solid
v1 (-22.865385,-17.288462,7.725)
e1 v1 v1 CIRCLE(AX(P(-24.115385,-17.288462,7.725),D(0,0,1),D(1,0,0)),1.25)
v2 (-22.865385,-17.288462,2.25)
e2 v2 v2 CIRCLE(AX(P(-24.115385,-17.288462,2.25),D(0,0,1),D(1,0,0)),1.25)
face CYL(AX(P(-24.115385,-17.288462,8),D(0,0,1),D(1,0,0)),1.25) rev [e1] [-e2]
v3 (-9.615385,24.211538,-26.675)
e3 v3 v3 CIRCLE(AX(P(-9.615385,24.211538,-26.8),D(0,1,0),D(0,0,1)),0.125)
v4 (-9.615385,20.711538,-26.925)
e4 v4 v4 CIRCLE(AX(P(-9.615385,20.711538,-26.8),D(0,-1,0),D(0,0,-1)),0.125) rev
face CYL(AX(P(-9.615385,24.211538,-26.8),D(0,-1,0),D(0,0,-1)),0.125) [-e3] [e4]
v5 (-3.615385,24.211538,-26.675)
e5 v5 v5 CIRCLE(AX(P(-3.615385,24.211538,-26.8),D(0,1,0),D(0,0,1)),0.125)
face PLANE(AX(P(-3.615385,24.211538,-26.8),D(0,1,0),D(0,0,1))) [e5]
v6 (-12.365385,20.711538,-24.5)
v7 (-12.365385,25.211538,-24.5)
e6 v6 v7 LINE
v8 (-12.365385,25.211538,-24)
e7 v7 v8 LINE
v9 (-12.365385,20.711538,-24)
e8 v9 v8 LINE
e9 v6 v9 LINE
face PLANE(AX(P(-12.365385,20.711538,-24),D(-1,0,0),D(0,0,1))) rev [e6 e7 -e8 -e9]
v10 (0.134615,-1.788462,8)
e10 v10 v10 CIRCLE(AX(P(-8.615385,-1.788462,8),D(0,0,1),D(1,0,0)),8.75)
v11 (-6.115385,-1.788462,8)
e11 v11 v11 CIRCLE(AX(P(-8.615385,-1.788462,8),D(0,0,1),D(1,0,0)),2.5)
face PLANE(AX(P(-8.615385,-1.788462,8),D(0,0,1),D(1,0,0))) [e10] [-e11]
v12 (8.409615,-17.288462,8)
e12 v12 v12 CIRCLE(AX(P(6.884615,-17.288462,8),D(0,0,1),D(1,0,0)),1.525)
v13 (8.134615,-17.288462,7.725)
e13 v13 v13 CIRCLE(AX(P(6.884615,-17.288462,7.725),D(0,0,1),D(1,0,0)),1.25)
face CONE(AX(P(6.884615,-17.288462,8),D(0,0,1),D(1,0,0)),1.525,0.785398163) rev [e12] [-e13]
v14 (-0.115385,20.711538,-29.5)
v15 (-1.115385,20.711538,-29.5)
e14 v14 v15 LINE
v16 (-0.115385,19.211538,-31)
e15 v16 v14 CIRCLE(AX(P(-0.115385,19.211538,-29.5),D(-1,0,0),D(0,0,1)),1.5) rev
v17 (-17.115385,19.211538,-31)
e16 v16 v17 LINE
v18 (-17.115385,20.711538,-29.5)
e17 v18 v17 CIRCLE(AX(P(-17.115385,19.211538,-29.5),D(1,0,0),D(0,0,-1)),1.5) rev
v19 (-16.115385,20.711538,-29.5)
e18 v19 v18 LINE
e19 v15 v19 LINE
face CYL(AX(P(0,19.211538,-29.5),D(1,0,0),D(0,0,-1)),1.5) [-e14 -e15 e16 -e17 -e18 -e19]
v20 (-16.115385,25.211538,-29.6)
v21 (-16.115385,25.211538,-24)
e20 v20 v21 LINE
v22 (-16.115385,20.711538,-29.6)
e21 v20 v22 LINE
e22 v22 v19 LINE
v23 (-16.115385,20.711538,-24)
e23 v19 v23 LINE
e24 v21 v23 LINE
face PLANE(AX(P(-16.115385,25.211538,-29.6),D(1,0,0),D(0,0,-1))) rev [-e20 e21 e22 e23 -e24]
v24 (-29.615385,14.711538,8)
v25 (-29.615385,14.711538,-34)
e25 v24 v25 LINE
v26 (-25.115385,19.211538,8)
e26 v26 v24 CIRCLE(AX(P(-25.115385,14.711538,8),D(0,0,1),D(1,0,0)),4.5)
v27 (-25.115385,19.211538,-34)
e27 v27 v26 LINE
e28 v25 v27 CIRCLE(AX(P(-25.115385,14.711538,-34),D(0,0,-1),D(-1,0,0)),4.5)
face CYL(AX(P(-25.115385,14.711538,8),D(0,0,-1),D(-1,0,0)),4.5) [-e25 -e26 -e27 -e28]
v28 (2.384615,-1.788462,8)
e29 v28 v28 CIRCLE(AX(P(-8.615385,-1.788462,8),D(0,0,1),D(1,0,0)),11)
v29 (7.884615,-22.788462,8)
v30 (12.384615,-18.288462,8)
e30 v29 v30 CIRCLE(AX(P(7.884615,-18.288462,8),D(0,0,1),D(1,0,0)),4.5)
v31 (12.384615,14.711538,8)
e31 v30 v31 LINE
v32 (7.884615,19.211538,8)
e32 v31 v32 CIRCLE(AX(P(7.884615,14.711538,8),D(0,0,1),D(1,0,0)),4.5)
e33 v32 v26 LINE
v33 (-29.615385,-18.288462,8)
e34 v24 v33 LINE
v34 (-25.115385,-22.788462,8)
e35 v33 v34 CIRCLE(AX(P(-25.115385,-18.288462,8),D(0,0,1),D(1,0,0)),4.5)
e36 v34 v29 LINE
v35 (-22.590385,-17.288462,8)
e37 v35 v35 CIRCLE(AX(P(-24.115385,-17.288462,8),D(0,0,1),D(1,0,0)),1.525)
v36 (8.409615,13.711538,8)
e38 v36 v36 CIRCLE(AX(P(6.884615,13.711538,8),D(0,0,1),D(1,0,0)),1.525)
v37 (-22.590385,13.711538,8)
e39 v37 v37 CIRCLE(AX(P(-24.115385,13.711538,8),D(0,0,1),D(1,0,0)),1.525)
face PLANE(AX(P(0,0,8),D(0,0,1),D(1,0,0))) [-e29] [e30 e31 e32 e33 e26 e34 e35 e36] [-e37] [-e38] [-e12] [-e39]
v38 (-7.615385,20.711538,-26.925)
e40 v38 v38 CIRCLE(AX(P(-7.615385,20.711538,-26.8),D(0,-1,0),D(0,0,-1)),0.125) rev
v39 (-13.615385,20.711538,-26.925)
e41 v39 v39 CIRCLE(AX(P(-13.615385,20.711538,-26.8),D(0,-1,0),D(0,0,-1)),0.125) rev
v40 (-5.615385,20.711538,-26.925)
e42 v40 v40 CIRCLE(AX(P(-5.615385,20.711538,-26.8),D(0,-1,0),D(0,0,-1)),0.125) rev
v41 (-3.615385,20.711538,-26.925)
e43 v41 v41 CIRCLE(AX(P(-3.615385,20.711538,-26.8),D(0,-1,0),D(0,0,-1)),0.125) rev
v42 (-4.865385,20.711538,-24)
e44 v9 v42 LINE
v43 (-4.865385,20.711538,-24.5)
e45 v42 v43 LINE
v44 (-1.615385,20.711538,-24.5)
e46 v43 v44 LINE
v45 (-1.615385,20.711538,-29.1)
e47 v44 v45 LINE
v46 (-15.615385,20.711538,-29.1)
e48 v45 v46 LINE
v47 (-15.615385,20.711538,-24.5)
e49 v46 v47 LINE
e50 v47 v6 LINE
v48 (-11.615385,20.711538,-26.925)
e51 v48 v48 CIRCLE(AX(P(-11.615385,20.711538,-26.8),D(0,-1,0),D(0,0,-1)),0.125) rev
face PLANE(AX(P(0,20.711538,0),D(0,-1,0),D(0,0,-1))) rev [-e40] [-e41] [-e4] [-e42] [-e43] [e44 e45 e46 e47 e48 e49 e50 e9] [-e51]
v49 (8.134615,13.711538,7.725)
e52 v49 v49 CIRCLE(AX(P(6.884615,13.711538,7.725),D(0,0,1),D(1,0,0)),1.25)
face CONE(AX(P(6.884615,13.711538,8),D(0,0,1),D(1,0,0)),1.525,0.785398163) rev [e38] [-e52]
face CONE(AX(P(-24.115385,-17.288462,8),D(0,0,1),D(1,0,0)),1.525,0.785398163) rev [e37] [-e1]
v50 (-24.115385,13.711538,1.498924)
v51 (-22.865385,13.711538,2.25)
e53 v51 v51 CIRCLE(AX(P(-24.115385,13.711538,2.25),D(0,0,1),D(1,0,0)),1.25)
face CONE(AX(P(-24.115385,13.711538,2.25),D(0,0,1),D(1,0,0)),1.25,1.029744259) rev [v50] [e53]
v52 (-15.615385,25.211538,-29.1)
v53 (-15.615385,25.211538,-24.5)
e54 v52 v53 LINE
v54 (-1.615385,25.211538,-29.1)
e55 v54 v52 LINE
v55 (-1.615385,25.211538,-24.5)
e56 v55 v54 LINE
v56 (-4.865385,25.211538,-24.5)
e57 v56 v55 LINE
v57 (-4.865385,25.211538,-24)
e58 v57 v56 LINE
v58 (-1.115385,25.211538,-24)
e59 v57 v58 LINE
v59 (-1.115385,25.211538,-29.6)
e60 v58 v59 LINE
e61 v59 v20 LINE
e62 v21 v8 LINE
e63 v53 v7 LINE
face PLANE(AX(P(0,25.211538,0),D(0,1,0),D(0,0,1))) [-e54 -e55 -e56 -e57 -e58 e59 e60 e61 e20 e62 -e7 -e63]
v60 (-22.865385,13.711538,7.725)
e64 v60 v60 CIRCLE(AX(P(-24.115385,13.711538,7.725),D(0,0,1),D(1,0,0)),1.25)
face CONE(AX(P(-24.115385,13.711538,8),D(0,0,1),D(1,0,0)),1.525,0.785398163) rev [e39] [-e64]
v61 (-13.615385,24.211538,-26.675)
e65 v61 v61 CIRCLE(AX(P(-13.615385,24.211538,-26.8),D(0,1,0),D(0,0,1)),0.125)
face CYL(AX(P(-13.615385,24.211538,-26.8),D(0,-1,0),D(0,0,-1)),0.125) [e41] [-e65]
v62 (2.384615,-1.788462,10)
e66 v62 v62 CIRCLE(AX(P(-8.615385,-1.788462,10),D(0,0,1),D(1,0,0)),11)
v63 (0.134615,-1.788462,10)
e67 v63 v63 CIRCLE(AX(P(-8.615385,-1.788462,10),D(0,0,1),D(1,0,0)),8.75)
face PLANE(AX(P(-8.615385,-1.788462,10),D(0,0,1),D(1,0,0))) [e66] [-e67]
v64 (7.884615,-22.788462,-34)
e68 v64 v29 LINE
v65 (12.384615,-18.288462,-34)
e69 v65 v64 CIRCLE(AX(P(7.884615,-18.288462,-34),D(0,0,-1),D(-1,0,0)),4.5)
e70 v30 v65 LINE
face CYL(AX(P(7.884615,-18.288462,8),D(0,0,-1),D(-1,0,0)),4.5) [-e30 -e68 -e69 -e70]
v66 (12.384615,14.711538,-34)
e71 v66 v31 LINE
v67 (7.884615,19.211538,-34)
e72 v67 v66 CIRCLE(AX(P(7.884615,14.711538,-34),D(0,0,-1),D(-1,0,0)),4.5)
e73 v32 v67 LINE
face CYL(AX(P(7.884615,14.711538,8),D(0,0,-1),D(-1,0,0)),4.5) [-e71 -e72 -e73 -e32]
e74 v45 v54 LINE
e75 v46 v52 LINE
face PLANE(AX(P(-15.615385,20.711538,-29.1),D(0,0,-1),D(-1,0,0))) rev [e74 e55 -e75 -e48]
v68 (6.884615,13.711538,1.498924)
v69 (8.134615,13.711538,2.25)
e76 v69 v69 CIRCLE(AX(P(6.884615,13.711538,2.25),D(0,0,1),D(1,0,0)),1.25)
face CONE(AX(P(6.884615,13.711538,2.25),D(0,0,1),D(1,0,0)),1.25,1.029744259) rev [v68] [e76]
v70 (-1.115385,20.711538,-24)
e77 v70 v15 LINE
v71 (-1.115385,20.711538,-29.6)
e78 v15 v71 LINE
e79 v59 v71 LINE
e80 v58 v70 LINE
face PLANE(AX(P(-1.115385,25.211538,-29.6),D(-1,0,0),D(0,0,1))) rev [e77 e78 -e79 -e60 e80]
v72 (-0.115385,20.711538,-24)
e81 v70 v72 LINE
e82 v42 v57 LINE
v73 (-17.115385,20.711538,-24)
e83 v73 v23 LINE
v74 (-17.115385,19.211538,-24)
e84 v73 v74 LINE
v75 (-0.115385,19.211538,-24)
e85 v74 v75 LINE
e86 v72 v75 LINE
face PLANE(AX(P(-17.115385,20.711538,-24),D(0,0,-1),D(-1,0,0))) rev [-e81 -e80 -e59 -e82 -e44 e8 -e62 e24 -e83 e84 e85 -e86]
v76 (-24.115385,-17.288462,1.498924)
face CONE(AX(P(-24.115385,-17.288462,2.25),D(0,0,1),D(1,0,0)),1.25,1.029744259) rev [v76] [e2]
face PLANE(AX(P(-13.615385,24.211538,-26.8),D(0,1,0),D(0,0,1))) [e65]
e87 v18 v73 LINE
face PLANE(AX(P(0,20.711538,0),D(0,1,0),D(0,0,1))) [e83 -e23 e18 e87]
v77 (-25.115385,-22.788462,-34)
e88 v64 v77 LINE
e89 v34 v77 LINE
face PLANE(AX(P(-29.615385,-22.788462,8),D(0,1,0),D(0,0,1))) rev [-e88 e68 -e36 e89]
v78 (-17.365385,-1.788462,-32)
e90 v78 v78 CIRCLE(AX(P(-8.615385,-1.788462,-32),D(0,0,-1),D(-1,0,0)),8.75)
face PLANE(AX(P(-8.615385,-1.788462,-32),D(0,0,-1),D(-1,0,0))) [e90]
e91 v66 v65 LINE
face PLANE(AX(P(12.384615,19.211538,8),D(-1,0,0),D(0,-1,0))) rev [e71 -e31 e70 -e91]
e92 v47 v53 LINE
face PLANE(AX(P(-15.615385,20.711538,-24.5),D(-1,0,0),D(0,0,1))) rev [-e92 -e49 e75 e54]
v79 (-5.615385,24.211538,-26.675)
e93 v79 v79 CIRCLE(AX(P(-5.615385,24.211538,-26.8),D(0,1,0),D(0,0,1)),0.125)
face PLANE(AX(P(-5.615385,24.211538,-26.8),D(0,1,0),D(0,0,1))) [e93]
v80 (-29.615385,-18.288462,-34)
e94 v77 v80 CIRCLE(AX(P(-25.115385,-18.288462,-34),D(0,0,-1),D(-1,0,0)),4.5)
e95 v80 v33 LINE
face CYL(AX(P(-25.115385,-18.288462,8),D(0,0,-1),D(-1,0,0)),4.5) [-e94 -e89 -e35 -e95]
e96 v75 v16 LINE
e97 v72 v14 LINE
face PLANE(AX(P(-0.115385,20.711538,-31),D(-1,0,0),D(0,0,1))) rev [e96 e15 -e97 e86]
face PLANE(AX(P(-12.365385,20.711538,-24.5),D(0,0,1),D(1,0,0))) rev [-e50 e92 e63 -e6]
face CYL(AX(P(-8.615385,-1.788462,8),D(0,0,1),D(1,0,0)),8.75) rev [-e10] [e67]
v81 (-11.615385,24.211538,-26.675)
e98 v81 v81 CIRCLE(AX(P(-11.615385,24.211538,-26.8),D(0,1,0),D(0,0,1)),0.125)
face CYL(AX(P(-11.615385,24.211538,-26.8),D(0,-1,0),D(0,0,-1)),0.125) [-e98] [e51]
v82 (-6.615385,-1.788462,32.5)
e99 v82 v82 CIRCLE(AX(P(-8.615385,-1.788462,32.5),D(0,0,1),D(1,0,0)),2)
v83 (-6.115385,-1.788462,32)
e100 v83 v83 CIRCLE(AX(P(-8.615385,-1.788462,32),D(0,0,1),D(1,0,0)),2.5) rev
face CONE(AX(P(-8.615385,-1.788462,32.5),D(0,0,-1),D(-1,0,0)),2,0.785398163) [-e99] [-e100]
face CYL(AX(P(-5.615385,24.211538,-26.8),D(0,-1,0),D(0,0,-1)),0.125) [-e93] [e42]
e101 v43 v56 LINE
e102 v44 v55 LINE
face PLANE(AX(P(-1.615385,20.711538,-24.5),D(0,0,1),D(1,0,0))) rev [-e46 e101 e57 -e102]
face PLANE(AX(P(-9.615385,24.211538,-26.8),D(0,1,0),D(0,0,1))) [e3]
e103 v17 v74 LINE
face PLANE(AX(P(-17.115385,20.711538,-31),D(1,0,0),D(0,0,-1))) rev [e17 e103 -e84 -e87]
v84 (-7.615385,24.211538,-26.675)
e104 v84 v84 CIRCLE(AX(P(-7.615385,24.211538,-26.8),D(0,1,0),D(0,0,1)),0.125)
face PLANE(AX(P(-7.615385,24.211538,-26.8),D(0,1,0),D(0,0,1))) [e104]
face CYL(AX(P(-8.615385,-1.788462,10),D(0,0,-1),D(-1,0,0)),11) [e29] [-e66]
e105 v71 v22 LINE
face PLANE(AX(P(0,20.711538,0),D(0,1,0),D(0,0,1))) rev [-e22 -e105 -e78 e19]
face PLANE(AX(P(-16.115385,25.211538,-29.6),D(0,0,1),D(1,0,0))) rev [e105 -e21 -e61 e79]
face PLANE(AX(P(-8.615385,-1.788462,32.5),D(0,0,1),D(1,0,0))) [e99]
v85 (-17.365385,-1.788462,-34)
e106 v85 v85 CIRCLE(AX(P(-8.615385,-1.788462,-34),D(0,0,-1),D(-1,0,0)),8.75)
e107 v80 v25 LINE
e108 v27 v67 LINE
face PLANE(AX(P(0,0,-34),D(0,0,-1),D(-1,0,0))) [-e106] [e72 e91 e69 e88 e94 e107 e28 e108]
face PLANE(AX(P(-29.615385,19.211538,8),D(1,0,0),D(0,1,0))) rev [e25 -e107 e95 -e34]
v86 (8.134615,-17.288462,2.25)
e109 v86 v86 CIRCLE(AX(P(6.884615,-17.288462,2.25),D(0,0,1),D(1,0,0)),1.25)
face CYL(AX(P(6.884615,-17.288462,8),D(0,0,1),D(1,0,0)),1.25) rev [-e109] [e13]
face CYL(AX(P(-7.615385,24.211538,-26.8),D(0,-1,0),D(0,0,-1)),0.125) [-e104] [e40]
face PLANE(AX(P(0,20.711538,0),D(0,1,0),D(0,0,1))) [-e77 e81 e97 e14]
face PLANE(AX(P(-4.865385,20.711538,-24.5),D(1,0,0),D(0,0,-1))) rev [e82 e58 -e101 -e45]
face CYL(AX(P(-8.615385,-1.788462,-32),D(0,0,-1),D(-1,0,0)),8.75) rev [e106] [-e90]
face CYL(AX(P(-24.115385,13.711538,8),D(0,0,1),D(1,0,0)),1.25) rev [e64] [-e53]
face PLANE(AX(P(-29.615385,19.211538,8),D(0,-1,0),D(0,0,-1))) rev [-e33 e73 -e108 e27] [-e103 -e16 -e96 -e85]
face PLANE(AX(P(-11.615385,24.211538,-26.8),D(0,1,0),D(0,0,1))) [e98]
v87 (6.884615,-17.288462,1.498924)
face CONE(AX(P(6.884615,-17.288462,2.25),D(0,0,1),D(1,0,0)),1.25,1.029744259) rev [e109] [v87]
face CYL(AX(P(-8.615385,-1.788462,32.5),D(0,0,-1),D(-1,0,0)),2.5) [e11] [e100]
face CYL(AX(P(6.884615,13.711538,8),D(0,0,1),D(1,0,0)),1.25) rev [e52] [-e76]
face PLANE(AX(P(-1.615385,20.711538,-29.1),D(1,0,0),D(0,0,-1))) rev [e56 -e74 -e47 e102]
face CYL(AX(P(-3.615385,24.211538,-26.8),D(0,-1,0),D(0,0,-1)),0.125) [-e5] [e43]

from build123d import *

# Parameters (mm, degrees)
SKETCH1_W                       = 42
SKETCH1_H                       = 42
BOSS_EXTRUDE2_DEPTH             = 8
SKETCH2_R                       = 11
BOSS_EXTRUDE3_DEPTH             = 2
SKETCH4_W                       = 42
SKETCH4_H                       = 42
BOSS_EXTRUDE5_DEPTH             = 24
SKETCH5_W                       = 42
SKETCH5_H                       = 42
BOSS_EXTRUDE6_DEPTH             = 10
FILLET1_R                       = 4.5
SKETCH7_R                       = 8.75
CUT_EXTRUDE1_DEPTH              = 2
CUT_EXTRUDE2_START              = -2
SKETCH8_R                       = 8.75
CUT_EXTRUDE2_DEPTH              = 2
SKETCH9_R                       = 2.5
BOSS_EXTRUDE9_DEPTH             = 24.5
CHAMFER2_SIZE                   = 0.5
M3X0_5_TAPPED_HOLE1_D           = 2.5
M3X0_5_TAPPED_HOLE1_DEPTH       = 5.75
M3X0_5_TAPPED_HOLE1_CSINK_D     = 3.05
M3X0_5_TAPPED_HOLE1_CSINK_ANGLE = 90
M3X0_5_TAPPED_HOLE1_TIP         = 0.751075774
SKETCH12_W                      = 17
SKETCH12_H                      = 7
BOSS_EXTRUDE10_DEPTH            = 1.5
FILLET2_R                       = 1.5
SKETCH13_W                      = 15
SKETCH13_H                      = 5.6
BOSS_EXTRUDE11_DEPTH            = 4.5
CUT_EXTRUDE3_DEPTH              = 4.5
SKETCH16_R                      = 0.125
BOSS_EXTRUDE12_DEPTH            = 3.5
LPATTERN1_COUNT                 = 6
LPATTERN1_PITCH                 = 2


with BuildPart() as part:
    # Sketch1 → Boss-Extrude2 (new body)
    with BuildSketch(Plane.XY):
        with Locations((-8.615384615, -1.788461538)):
            Rectangle(SKETCH1_W, SKETCH1_H)
    extrude(amount=BOSS_EXTRUDE2_DEPTH)

    # Sketch2 → Boss-Extrude3 (add)
    with BuildSketch(Plane.XY.offset(8)):
        with Locations((-8.615384615, -1.788461538)):
            Circle(SKETCH2_R)
    extrude(amount=BOSS_EXTRUDE3_DEPTH)

    # Sketch4 → Boss-Extrude5 (add)
    with BuildSketch(Plane(origin=(0, 0, 0), x_dir=(-1, 0, 0), z_dir=(0, 0, -1))):
        with Locations((8.615384615, -1.788461538)):
            Rectangle(SKETCH4_W, SKETCH4_H)
    extrude(amount=BOSS_EXTRUDE5_DEPTH)

    # Sketch5 → Boss-Extrude6 (add)
    with BuildSketch(Plane(origin=(0, 0, -24), x_dir=(-1, 0, 0), z_dir=(0, 0, -1))):
        with Locations((8.615384615, -1.788461538)):
            Rectangle(SKETCH5_W, SKETCH5_H)
    extrude(amount=BOSS_EXTRUDE6_DEPTH)

    # Fillet1
    fillet1_edges = [part.edges().sort_by_distance(p)[0] for p in [
        (-29.615384615, 19.211538462, -13),
        (12.384615385, 19.211538462, -13),
        (12.384615385, -22.788461538, -13),
        (-29.615384615, -22.788461538, -13),
    ]]
    fillet(fillet1_edges, radius=FILLET1_R)

    # Sketch7 → Cut-Extrude1 (cut)
    with BuildSketch(Plane(origin=(0, 0, -34), x_dir=(-1, 0, 0), z_dir=(0, 0, -1))):
        with Locations((8.615384615, -1.788461538)):
            Circle(SKETCH7_R)
    extrude(amount=-CUT_EXTRUDE1_DEPTH, mode=Mode.SUBTRACT)

    # Sketch8 → Cut-Extrude2 (cut)
    with BuildSketch(Plane.XY.offset(10).offset(CUT_EXTRUDE2_START)):
        with Locations(Location((-8.615384615, -1.788461538, 0), (0, 0, 180))):
            Circle(SKETCH8_R)
    extrude(amount=CUT_EXTRUDE2_DEPTH, mode=Mode.SUBTRACT)

    # Sketch9 → Boss-Extrude9 (add)
    with BuildSketch(Plane.XY.offset(8)):
        with Locations((-8.615384615, -1.788461538)):
            Circle(SKETCH9_R)
    extrude(amount=BOSS_EXTRUDE9_DEPTH)

    # Chamfer2
    chamfer2_edges = [part.edges().sort_by_distance(p)[0] for p in [
        (-11.115384615, -1.788461538, 32.5),
    ]]
    chamfer(chamfer2_edges, length=CHAMFER2_SIZE)

    # M3x0.5 Tapped Hole1
    with Locations(Plane(origin=(-24.115384615, 13.711538462, 8), x_dir=(1, 0, 0), z_dir=(0, 0, 1))):
        with Locations((0, 0), (31, 0), (31, -31), (0, -31)):
            CounterSinkHole(M3X0_5_TAPPED_HOLE1_D / 2, M3X0_5_TAPPED_HOLE1_CSINK_D / 2, depth=M3X0_5_TAPPED_HOLE1_DEPTH, counter_sink_angle=M3X0_5_TAPPED_HOLE1_CSINK_ANGLE)
            with Locations((0, 0, -(M3X0_5_TAPPED_HOLE1_DEPTH + M3X0_5_TAPPED_HOLE1_TIP / 2))):  # 118° drill point
                Cone(0, M3X0_5_TAPPED_HOLE1_D / 2, M3X0_5_TAPPED_HOLE1_TIP, mode=Mode.SUBTRACT)

    # Sketch12 → Boss-Extrude10 (add)
    with BuildSketch(Plane(origin=(0, 19.211538462, 0), x_dir=(1, 0, 0), z_dir=(0, 1, 0))):
        with Locations((-8.615384615, 27.5)):
            Rectangle(SKETCH12_W, SKETCH12_H)
    extrude(amount=BOSS_EXTRUDE10_DEPTH)

    # Fillet2
    fillet2_edges = [part.edges().sort_by_distance(p)[0] for p in [
        (-8.615384615, 20.711538462, -31),
    ]]
    fillet(fillet2_edges, radius=FILLET2_R - 0.0001)  # a hair under: the kernel refuses the full size

    # Sketch13 → Boss-Extrude11 (add)
    with BuildSketch(Plane(origin=(0, 20.711538462, 0), x_dir=(1, 0, 0), z_dir=(0, 1, 0))):
        with Locations((-8.615384615, 26.8)):
            Rectangle(SKETCH13_W, SKETCH13_H)
    extrude(amount=BOSS_EXTRUDE11_DEPTH)

    # Sketch15 → Cut-Extrude3 (cut)
    with BuildSketch(Plane(origin=(0, 25.211538462, 0), x_dir=(1, 0, 0), z_dir=(0, 1, 0))):
        Polygon((-12.365384615, 24), (-12.365384615, 24.5), (-15.615384615, 24.5), (-15.615384615, 29.1), (-1.615384615, 29.1), (-1.615384615, 24.5), (-4.865384615, 24.5), (-4.865384615, 24), align=None)
    extrude(amount=-CUT_EXTRUDE3_DEPTH, mode=Mode.SUBTRACT)

    # Sketch16 → Boss-Extrude12 (add)
    with BuildSketch(Plane(origin=(0, 20.711538462, 0), x_dir=(1, 0, 0), z_dir=(0, 1, 0))):
        with Locations(Location((-13.615384615, 26.8, 0), (0, 0, 90))):
            Circle(SKETCH16_R)
    boss_extrude12 = extrude(amount=BOSS_EXTRUDE12_DEPTH)

    # LPattern1: Boss-Extrude12 ×6
    with Locations(*[(i * LPATTERN1_PITCH, 0, 0) for i in range(1, LPATTERN1_COUNT)]):
        add(boss_extrude12)


solid = part.part
